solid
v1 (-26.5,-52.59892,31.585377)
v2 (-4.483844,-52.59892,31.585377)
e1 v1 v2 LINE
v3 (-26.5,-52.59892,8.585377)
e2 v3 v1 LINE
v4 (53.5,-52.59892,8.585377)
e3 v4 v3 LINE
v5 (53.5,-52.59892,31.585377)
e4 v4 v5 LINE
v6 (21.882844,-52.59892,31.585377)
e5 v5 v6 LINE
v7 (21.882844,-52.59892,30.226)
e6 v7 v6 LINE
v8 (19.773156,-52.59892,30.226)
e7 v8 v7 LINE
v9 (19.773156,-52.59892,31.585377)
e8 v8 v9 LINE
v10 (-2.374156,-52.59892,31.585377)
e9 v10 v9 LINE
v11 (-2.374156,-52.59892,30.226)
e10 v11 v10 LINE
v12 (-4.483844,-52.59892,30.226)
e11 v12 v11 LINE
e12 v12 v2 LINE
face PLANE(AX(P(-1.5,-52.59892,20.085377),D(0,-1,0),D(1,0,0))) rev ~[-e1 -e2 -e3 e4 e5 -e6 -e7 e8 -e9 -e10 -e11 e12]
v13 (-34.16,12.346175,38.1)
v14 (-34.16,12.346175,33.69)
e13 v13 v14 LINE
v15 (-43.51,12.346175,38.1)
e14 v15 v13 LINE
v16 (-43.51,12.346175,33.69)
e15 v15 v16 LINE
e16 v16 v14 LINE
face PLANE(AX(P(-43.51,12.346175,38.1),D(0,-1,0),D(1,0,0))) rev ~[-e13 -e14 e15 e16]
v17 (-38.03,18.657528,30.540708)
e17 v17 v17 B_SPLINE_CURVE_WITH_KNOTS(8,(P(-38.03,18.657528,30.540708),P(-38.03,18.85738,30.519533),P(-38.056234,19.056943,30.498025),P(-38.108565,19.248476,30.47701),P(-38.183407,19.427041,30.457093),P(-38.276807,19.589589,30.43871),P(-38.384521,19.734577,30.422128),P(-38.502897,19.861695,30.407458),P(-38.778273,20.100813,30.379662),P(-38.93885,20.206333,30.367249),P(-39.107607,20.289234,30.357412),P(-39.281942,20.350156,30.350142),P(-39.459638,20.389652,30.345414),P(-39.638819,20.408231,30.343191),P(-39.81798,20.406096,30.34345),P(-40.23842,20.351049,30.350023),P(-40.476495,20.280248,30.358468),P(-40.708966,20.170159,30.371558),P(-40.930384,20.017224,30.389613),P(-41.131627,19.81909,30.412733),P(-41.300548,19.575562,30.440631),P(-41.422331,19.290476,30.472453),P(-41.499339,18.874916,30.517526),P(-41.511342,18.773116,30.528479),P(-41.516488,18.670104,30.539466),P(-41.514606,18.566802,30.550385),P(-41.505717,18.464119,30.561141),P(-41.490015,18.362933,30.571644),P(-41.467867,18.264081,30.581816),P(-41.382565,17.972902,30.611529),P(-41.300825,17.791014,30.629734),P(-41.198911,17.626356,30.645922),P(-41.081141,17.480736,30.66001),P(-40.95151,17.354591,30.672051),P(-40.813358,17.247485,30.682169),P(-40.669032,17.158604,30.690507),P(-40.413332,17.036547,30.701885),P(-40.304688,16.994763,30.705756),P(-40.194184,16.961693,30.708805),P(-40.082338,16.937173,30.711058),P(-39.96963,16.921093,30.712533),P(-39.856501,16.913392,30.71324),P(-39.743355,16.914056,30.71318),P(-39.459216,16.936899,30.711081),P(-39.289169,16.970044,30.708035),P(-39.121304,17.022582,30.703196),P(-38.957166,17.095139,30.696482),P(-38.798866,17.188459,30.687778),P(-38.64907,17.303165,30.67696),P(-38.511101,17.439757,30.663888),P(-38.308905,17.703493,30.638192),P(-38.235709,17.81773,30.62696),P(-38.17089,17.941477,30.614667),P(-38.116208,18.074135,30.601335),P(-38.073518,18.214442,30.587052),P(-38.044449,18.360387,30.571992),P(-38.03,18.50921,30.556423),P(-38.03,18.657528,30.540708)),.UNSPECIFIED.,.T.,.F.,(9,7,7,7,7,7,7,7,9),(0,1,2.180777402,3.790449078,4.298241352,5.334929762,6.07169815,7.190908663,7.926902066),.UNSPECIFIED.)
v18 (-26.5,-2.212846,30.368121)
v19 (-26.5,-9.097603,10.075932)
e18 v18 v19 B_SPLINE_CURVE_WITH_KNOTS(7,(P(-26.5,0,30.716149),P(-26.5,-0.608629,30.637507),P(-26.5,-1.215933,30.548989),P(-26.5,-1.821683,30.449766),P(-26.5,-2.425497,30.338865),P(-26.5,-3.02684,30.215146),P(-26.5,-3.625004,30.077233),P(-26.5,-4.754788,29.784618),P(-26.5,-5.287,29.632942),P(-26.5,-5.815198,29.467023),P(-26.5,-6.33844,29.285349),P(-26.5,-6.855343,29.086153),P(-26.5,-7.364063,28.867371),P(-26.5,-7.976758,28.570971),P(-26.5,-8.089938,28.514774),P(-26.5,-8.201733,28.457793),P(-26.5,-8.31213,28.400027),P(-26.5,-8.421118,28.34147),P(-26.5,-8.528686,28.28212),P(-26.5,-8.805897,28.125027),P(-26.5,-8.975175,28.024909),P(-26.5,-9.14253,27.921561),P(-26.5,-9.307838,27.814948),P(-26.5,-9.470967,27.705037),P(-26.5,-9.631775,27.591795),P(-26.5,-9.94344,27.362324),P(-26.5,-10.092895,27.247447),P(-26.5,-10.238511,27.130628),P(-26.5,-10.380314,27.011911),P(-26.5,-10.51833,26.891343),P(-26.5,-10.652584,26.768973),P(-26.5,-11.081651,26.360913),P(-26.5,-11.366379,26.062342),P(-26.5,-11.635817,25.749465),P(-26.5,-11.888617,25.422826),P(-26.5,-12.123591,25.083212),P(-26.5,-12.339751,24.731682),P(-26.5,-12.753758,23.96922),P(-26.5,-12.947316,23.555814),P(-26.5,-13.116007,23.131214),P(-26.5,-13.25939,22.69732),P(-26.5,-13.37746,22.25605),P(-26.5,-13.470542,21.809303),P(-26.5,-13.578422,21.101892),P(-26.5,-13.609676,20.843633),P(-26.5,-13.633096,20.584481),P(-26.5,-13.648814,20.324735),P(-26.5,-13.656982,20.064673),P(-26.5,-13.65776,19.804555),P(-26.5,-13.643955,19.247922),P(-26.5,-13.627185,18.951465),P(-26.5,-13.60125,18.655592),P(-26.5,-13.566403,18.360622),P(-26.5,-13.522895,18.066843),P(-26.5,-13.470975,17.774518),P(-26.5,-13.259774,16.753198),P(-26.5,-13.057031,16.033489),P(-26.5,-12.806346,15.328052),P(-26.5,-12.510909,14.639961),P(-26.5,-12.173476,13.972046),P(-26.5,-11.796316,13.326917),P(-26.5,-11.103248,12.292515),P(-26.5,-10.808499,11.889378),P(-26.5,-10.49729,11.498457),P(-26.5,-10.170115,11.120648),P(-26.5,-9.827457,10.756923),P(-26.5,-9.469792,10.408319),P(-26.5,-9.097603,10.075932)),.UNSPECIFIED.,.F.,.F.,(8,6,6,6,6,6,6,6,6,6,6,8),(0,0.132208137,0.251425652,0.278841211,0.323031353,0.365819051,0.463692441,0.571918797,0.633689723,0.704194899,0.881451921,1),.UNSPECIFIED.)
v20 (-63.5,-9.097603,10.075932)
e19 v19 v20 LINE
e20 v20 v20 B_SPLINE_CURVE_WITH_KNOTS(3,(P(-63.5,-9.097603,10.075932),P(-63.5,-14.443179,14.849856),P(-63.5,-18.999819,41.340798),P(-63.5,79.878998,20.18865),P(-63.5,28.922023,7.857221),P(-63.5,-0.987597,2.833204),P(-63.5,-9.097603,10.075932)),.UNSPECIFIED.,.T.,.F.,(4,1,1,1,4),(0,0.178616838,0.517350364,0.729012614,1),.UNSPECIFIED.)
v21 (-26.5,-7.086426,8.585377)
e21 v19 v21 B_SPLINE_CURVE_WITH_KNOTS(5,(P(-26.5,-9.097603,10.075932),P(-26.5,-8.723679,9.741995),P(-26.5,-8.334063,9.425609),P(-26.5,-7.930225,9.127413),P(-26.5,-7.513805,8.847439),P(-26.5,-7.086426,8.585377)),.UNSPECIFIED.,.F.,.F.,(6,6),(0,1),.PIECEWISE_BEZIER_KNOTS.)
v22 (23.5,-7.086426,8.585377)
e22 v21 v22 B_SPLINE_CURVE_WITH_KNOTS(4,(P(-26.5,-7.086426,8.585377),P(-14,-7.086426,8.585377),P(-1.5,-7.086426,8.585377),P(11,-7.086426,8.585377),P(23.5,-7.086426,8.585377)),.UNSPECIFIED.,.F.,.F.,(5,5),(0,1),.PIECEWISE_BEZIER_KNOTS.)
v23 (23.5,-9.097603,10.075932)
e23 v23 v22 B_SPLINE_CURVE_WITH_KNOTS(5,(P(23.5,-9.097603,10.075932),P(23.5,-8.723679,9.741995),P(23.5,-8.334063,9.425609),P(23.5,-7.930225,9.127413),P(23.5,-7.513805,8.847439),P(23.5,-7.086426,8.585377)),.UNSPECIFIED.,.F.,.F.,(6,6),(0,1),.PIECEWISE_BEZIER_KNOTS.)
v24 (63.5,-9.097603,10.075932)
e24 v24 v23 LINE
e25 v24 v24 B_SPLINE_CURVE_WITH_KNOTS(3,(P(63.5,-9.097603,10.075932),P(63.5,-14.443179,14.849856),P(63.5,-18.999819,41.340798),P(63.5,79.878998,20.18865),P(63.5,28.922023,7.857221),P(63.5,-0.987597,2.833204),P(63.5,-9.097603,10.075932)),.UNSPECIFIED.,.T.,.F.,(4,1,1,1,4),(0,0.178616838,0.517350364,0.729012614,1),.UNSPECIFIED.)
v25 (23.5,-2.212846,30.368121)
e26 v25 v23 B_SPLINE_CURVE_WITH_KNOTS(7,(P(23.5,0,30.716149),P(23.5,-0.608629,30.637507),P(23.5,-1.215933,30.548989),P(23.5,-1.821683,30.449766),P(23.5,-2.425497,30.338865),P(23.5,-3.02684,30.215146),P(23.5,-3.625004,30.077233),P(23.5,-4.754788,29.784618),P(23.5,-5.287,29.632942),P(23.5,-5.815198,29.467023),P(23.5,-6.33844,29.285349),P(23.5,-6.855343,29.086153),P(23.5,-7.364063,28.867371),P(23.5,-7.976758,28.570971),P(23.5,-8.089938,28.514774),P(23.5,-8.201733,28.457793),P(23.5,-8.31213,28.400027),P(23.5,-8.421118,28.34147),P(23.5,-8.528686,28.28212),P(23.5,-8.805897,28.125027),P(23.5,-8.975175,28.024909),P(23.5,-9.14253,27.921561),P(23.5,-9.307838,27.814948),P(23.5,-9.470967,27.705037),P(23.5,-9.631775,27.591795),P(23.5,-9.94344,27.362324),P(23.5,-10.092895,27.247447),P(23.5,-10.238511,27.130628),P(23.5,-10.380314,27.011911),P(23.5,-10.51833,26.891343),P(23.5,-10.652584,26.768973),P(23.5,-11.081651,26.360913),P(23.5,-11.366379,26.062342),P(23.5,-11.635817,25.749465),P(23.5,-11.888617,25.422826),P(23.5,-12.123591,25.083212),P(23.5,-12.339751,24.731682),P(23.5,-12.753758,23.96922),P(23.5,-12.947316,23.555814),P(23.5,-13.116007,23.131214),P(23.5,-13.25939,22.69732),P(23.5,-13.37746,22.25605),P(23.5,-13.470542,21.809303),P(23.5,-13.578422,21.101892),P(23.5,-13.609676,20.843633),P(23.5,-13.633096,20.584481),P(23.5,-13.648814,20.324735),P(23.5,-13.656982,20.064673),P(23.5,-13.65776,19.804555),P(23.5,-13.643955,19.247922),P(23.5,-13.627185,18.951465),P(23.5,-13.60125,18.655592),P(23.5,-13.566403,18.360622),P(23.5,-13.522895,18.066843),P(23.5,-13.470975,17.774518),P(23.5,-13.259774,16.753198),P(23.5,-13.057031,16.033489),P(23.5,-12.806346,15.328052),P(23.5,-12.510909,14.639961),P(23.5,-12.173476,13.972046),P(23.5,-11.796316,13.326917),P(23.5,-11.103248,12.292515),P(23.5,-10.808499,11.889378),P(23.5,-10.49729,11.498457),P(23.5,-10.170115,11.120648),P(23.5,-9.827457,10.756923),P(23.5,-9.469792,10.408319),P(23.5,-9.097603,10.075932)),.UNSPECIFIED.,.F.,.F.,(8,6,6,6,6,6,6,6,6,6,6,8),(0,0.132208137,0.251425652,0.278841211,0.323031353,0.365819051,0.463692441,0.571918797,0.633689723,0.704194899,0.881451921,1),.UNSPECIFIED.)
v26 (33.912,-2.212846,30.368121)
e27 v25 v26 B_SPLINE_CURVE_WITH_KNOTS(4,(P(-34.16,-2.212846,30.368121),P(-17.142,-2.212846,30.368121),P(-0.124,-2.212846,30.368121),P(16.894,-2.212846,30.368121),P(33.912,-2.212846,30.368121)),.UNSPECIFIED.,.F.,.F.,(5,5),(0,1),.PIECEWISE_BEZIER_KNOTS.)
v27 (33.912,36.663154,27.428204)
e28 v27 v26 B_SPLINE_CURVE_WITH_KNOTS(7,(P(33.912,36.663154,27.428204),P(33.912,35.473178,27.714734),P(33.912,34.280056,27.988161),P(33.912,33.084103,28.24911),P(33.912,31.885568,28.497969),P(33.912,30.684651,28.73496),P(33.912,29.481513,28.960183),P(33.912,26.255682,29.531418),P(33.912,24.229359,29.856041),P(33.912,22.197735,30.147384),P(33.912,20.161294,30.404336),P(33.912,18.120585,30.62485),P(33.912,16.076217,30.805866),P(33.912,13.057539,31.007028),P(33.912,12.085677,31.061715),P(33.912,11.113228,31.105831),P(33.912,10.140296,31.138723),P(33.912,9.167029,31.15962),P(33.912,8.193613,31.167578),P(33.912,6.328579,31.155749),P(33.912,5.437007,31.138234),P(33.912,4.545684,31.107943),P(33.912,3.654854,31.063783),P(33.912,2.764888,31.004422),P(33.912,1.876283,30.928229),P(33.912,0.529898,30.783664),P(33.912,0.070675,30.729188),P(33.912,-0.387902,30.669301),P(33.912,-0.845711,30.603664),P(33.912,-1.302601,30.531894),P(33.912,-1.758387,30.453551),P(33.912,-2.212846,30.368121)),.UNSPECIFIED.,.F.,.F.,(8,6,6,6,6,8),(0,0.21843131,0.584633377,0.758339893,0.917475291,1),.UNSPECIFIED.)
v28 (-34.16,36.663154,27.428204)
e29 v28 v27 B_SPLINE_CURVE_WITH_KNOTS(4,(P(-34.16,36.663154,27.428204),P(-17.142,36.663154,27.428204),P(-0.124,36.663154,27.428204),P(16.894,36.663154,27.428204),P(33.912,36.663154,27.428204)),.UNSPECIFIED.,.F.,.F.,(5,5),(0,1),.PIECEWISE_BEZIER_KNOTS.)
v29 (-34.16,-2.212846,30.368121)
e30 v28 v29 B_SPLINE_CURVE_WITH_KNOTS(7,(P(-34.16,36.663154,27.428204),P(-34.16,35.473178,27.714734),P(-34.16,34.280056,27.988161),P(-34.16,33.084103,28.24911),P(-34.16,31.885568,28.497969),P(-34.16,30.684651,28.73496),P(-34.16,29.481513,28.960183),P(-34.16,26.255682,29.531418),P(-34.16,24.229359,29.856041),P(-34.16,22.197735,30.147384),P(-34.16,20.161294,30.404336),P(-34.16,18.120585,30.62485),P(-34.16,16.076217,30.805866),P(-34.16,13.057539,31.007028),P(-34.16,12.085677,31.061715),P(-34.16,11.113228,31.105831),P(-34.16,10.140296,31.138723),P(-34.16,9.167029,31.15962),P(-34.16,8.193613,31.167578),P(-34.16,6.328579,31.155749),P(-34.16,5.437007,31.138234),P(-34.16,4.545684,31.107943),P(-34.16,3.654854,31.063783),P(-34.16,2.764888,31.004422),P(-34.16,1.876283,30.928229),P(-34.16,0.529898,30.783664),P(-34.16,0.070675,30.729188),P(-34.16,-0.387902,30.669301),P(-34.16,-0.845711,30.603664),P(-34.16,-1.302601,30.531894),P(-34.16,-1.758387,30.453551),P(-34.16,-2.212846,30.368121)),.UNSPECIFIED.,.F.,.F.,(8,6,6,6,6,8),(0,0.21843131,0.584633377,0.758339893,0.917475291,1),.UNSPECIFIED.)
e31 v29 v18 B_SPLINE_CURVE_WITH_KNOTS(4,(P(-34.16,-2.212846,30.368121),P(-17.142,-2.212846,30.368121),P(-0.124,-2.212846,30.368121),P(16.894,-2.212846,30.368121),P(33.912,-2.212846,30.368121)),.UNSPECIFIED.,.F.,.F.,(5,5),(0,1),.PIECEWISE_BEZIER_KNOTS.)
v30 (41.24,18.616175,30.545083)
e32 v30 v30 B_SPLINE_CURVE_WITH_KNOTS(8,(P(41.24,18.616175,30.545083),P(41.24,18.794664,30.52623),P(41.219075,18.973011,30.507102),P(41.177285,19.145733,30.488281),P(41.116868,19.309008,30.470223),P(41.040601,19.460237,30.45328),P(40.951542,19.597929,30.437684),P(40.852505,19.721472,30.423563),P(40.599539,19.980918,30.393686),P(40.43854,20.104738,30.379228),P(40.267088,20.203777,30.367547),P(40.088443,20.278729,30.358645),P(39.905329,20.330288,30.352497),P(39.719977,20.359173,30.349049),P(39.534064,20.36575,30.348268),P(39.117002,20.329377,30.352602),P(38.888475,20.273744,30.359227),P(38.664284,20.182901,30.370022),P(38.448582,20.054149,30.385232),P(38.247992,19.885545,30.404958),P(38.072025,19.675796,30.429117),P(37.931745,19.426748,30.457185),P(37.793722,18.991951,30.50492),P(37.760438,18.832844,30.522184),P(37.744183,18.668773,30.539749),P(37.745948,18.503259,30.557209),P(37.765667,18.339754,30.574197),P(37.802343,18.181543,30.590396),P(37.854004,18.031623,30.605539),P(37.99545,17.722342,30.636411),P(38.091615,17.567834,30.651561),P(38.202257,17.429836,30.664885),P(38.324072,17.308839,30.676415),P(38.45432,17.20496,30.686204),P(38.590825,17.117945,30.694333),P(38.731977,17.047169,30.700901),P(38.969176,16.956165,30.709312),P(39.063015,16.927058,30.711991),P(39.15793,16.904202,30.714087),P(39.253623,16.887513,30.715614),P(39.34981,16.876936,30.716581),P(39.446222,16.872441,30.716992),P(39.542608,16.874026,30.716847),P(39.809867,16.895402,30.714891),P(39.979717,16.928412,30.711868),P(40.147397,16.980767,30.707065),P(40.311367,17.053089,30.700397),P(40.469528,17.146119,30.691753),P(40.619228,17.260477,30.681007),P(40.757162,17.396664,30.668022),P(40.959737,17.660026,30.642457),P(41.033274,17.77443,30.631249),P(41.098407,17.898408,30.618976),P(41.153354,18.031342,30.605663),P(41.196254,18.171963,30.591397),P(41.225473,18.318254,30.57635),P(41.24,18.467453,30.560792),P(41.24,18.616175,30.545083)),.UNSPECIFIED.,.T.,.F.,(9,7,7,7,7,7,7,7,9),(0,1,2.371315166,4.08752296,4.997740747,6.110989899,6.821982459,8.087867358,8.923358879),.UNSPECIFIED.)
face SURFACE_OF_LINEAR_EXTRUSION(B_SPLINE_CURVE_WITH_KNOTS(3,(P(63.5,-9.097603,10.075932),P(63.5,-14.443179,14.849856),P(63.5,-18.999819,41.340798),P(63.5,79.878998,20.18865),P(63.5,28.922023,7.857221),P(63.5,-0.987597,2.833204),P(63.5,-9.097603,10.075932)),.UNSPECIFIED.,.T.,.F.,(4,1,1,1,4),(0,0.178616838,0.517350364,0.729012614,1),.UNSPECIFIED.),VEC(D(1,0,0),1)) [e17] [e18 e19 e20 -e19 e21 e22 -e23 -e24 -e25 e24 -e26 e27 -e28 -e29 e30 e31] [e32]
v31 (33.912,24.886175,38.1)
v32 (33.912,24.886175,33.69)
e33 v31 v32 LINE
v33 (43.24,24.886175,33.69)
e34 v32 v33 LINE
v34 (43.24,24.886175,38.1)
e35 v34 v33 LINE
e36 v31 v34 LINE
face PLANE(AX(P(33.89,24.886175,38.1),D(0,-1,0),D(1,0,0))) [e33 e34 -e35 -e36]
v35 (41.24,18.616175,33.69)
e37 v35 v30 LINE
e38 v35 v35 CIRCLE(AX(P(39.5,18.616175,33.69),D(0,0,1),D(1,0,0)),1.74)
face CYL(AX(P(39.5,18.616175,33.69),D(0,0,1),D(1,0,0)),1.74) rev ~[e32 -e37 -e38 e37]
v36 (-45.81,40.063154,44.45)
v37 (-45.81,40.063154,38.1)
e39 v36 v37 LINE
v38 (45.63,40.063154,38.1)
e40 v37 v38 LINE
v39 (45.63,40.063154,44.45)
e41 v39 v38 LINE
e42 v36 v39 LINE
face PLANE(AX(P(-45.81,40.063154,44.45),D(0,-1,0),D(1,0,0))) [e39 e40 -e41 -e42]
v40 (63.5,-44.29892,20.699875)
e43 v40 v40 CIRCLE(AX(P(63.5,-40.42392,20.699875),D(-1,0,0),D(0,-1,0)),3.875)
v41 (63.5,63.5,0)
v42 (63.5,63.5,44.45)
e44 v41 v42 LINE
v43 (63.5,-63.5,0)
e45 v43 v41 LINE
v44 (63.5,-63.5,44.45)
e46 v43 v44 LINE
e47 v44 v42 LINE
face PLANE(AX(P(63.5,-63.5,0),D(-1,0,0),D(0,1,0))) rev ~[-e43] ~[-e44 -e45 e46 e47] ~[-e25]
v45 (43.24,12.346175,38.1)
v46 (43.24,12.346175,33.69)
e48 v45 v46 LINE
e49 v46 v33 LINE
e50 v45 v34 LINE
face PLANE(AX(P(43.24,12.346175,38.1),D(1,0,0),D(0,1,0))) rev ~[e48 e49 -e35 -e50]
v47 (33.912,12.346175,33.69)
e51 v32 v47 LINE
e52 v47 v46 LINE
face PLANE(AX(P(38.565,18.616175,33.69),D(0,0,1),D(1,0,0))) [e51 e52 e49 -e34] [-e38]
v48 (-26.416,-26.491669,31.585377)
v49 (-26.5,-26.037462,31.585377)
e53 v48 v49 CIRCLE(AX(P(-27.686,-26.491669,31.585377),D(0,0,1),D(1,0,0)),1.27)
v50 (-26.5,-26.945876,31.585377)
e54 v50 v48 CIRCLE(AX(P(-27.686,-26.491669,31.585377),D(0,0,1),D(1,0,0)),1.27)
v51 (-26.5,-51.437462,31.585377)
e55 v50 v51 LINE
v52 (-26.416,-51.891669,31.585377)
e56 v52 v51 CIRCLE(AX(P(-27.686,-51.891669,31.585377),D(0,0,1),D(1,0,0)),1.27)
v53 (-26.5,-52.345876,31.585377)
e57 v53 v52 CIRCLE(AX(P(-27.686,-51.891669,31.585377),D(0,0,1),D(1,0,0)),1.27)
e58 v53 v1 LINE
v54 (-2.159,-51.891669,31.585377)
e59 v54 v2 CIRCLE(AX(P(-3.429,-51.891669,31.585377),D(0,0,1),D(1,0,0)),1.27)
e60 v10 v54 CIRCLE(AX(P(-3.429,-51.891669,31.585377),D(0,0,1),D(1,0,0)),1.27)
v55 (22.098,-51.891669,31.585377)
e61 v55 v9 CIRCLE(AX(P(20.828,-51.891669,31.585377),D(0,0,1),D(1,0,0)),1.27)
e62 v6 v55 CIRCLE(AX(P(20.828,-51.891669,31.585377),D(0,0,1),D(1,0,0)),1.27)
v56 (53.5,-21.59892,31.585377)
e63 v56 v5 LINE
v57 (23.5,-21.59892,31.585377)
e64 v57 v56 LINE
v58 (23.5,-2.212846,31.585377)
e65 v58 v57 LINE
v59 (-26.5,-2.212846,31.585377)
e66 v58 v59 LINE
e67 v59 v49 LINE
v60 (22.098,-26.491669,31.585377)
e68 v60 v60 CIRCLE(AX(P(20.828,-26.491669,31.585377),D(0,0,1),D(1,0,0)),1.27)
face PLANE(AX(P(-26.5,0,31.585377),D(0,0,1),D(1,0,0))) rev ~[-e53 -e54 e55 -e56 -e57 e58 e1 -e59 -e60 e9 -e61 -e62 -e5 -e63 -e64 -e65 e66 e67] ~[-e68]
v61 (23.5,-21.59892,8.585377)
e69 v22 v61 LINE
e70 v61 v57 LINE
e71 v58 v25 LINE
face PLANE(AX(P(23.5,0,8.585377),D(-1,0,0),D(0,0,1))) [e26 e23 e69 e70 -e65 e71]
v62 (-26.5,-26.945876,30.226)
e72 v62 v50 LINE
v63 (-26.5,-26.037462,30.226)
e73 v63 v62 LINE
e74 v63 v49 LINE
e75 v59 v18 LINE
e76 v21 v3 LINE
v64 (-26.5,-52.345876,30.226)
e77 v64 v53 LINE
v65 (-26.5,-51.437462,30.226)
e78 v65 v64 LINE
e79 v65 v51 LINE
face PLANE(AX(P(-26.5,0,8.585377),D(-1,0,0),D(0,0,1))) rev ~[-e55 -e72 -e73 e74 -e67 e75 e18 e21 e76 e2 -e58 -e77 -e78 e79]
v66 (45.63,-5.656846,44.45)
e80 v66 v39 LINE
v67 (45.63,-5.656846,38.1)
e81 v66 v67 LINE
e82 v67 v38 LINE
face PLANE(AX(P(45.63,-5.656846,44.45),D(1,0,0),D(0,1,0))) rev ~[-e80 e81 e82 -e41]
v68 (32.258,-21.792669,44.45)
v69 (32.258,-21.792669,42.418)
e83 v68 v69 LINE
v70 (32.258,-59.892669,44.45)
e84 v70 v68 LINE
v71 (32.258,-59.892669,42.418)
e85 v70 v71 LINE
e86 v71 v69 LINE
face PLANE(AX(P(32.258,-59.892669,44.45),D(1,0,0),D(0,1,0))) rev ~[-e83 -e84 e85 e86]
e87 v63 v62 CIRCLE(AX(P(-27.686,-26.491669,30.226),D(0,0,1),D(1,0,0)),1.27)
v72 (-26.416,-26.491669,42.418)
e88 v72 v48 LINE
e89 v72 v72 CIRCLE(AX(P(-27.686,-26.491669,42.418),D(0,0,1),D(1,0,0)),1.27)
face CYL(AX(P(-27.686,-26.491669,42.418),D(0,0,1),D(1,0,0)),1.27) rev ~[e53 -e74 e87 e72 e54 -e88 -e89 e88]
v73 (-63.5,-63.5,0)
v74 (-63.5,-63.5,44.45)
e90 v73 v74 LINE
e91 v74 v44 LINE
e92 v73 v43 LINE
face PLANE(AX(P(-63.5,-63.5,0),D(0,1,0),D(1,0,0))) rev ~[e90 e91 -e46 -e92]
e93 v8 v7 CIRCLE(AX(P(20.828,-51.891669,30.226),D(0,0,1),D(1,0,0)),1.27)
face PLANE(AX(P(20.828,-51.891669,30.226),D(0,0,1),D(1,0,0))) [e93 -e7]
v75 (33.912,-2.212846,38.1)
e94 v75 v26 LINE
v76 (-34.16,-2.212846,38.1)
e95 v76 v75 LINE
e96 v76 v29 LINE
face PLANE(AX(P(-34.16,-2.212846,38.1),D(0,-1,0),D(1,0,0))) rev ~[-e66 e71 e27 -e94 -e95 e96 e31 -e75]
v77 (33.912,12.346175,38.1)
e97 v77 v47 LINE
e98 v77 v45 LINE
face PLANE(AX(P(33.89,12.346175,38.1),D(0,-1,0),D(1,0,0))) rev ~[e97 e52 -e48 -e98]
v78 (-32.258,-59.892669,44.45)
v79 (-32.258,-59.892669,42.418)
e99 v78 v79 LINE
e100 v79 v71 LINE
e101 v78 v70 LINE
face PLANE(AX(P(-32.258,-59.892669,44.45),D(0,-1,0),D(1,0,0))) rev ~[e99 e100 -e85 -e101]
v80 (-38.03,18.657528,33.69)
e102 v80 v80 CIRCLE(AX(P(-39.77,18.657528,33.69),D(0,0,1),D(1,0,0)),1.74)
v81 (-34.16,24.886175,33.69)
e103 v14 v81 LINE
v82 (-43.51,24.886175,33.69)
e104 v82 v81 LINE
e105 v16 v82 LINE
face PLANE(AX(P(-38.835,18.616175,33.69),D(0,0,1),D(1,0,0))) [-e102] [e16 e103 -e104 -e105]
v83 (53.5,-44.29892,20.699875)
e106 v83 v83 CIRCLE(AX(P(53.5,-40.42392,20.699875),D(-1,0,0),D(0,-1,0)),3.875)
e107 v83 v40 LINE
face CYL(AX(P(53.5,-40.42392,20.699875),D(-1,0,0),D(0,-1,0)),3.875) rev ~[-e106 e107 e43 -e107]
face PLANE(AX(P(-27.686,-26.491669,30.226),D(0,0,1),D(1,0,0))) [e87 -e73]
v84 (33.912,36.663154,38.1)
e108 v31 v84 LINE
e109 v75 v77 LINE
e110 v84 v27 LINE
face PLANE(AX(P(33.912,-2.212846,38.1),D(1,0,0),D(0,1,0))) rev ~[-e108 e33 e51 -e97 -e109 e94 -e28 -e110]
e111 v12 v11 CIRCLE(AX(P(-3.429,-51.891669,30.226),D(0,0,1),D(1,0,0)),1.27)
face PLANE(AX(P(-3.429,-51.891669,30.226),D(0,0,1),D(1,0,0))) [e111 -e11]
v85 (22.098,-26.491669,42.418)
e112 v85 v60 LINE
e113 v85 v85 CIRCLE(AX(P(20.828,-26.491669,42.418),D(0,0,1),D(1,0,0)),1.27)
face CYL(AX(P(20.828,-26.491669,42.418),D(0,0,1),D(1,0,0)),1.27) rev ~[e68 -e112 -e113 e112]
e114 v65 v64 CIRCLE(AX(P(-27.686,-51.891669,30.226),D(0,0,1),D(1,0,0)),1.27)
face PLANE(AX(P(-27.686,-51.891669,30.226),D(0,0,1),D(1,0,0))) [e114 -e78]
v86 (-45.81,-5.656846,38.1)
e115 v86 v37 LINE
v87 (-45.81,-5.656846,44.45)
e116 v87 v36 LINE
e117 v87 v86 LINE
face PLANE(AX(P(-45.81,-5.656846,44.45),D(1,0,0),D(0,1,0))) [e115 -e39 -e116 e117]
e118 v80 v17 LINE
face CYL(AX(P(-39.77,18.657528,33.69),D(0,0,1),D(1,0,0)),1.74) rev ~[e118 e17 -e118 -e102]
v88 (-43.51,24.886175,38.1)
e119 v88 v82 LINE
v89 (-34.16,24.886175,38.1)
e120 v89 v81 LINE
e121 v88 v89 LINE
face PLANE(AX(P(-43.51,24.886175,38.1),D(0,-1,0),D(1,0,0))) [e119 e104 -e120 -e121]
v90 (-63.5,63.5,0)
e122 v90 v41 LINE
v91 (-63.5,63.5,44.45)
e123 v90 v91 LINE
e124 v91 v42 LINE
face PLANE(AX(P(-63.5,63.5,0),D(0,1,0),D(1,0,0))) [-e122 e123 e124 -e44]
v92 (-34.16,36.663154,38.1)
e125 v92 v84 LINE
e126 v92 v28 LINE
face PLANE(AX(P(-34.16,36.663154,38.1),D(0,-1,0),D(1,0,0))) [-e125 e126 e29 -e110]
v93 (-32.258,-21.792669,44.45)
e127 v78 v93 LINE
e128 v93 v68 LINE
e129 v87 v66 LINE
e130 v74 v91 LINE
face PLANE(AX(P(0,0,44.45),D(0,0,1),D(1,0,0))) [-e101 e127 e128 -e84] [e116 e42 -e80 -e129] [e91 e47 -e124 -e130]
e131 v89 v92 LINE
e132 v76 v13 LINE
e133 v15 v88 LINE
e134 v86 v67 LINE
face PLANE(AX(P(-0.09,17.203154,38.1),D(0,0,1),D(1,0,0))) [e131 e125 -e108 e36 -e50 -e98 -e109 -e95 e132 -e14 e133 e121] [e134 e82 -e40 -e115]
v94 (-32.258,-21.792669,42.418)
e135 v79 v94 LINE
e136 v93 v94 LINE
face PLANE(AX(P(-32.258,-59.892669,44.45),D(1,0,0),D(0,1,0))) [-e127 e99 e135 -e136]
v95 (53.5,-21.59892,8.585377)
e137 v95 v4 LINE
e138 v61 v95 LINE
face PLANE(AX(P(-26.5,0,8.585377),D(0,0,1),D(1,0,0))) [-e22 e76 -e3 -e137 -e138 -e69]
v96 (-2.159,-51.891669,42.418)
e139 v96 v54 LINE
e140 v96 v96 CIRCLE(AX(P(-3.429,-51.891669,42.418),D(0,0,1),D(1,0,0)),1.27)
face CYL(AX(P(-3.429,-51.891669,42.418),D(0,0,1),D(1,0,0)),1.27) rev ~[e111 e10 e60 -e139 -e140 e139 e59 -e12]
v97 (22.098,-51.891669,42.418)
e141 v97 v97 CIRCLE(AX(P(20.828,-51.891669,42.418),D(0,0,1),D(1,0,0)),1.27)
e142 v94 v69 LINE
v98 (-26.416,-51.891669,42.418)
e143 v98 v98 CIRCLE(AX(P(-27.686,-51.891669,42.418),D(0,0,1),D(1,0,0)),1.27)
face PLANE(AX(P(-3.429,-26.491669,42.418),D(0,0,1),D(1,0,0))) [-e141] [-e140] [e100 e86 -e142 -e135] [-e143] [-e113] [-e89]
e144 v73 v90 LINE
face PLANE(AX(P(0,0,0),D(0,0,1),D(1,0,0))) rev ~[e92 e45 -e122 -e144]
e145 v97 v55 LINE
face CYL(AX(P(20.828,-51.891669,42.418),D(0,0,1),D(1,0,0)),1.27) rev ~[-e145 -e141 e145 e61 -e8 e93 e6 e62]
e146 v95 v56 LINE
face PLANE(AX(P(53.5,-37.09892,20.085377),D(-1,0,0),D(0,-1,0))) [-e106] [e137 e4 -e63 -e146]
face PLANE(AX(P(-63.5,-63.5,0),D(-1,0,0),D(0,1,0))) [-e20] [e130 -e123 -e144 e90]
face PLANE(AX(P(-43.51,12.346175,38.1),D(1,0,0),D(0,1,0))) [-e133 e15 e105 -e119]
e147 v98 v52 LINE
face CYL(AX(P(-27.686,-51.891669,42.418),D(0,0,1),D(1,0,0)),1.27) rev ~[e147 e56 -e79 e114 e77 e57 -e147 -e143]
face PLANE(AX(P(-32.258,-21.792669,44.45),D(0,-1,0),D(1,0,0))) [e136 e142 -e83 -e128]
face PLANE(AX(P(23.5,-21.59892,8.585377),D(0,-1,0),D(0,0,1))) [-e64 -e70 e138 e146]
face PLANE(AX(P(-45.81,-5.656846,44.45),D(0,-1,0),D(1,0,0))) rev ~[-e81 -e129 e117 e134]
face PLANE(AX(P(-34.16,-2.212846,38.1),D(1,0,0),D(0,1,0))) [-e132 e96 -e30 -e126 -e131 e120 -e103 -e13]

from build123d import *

# Parameters (mm, degrees)
F0_W      = 127
F0_H      = 127
F1_DEPTH  = 44.45
F2_W      = 64.516
F2_H      = 38.1
F3_DEPTH  = 2.032
F4_R      = 1.27
F5_DEPTH  = 12.192
F6_R      = 1.27
F7_DEPTH  = 12.192
F9_DEPTH  = 127
F10_W     = 91.44
F10_H     = 45.72
F11_DEPTH = 6.35
F12_W     = 68.072
F12_H     = 38.876
F13_DEPTH = 13.87
F14_W     = 9.35
F14_H     = 12.54
F15_DEPTH = 4.41
F16_R     = 1.74
F17_DEPTH = 8.4
F18_W     = 50
F18_H     = 23
F19_DEPTH = 52.59892
F20_W     = 31
F20_H     = 23
F21_DEPTH = 30
F22_R     = 3.875
F23_DEPTH = 10.4


with BuildPart() as f1:
    # F0 (on Top) → F1 (new body)
    with BuildSketch(Plane.XY):
        Rectangle(F0_W, F0_H)
    extrude(amount=F1_DEPTH)

    # F2 (on face) → F3 (cut)
    with BuildSketch(Plane.XY.offset(44.45)):
        with Locations((0, -40.8426690847)):
            Rectangle(F2_W, F2_H)
    extrude(amount=-F3_DEPTH, mode=Mode.SUBTRACT)

    # F4 (on face) → F5 (cut)
    with BuildSketch(Plane.XY.offset(42.418)):
        with Locations((20.828, -26.4916690847)):
            Circle(F4_R)
        with Locations((20.828, -51.8916690847)):
            Circle(F4_R)
        with Locations((-3.429, -51.8916690847)):
            Circle(F4_R)
        with Locations((-3.429, -26.4916690847)):
            Circle(F4_R)
        with Locations((-27.686, -26.4916690847)):
            Circle(F4_R)
        with Locations((-27.686, -51.8916690847)):
            Circle(F4_R)
    extrude(amount=-F5_DEPTH, mode=Mode.SUBTRACT)

    # F6 (on face) → F7 (join, through all)
    with BuildSketch(Plane.XY.offset(30.226)):
        with Locations((-3.429, -26.4916690847)):
            Circle(F6_R)
    extrude(amount=F7_DEPTH)

    # F8 (on face) → F9 (cut, through all)
    with BuildSketch(Plane.YZ.offset(63.5)):
        with BuildLine():
            add(Edge.make_bspline(
                [(-9.0976032104, 10.0759316516), (-14.4431789893, 14.8498555161), (-18.9998192848, 41.3407976718), (79.8789980532, 20.1886498245), (28.9220234676, 7.8572214413), (-0.9875973505, 2.8332038113), (-9.0976032104, 10.0759316516)],
                knots=[0, 0, 0, 0, 0.1786168384, 0.5173503637, 0.7290126141, 1, 1, 1, 1], degree=3))
        make_face()
    extrude(amount=-F9_DEPTH, mode=Mode.SUBTRACT)

    # F10 (on face) → F11 (cut)
    with BuildSketch(Plane.XY.offset(44.45)):
        with Locations((-0.09, 17.2031538572)):
            Rectangle(F10_W, F10_H)
    extrude(amount=-F11_DEPTH, mode=Mode.SUBTRACT)

    # F12 (on face) → F13 (cut)
    with BuildSketch(Plane.XY.offset(38.1)):
        with Locations((-0.124, 17.2251538572)):
            Rectangle(F12_W, F12_H)
    extrude(amount=-F13_DEPTH, mode=Mode.SUBTRACT)

    # F14 (on face) → F15 (cut)
    with BuildSketch(Plane.XY.offset(38.1)):
        with Locations((-38.835, 18.6161745679)):
            Rectangle(F14_W, F14_H)
        with Locations((38.565, 18.6161745679)):
            Rectangle(F14_W, F14_H)
    extrude(amount=-F15_DEPTH, mode=Mode.SUBTRACT)

    # F16 (on face) → F17 (cut)
    with BuildSketch(Plane.XY.offset(33.69)):
        with Locations((39.5, 18.6161745679)):
            Circle(F16_R)
        with Locations((-39.77, 18.657527864)):
            Circle(F16_R)
    extrude(amount=-F17_DEPTH, mode=Mode.SUBTRACT)

    # F18 (on Front) → F19 (cut)
    with BuildSketch(Plane.XZ):
        with Locations((-1.5, 20.0853766873)):
            Rectangle(F18_W, F18_H)
    extrude(amount=F19_DEPTH, mode=Mode.SUBTRACT)

    # F20 (on face) → F21 (cut)
    with BuildSketch(Plane(origin=(23.5, 0, 0), x_dir=(0, -1, 0), z_dir=(-1, 0, 0))):
        with Locations((37.09892, 20.0853766873)):
            Rectangle(F20_W, F20_H)
    extrude(amount=-F21_DEPTH, mode=Mode.SUBTRACT)

    # F22 (on face) → F23 (cut)
    with BuildSketch(Plane(origin=(53.5, 0, 0), x_dir=(0, -1, 0), z_dir=(-1, 0, 0))):
        with Locations((40.42392, 20.6998754293)):
            Circle(F22_R)
    extrude(amount=-F23_DEPTH, mode=Mode.SUBTRACT)


solid = f1.part
